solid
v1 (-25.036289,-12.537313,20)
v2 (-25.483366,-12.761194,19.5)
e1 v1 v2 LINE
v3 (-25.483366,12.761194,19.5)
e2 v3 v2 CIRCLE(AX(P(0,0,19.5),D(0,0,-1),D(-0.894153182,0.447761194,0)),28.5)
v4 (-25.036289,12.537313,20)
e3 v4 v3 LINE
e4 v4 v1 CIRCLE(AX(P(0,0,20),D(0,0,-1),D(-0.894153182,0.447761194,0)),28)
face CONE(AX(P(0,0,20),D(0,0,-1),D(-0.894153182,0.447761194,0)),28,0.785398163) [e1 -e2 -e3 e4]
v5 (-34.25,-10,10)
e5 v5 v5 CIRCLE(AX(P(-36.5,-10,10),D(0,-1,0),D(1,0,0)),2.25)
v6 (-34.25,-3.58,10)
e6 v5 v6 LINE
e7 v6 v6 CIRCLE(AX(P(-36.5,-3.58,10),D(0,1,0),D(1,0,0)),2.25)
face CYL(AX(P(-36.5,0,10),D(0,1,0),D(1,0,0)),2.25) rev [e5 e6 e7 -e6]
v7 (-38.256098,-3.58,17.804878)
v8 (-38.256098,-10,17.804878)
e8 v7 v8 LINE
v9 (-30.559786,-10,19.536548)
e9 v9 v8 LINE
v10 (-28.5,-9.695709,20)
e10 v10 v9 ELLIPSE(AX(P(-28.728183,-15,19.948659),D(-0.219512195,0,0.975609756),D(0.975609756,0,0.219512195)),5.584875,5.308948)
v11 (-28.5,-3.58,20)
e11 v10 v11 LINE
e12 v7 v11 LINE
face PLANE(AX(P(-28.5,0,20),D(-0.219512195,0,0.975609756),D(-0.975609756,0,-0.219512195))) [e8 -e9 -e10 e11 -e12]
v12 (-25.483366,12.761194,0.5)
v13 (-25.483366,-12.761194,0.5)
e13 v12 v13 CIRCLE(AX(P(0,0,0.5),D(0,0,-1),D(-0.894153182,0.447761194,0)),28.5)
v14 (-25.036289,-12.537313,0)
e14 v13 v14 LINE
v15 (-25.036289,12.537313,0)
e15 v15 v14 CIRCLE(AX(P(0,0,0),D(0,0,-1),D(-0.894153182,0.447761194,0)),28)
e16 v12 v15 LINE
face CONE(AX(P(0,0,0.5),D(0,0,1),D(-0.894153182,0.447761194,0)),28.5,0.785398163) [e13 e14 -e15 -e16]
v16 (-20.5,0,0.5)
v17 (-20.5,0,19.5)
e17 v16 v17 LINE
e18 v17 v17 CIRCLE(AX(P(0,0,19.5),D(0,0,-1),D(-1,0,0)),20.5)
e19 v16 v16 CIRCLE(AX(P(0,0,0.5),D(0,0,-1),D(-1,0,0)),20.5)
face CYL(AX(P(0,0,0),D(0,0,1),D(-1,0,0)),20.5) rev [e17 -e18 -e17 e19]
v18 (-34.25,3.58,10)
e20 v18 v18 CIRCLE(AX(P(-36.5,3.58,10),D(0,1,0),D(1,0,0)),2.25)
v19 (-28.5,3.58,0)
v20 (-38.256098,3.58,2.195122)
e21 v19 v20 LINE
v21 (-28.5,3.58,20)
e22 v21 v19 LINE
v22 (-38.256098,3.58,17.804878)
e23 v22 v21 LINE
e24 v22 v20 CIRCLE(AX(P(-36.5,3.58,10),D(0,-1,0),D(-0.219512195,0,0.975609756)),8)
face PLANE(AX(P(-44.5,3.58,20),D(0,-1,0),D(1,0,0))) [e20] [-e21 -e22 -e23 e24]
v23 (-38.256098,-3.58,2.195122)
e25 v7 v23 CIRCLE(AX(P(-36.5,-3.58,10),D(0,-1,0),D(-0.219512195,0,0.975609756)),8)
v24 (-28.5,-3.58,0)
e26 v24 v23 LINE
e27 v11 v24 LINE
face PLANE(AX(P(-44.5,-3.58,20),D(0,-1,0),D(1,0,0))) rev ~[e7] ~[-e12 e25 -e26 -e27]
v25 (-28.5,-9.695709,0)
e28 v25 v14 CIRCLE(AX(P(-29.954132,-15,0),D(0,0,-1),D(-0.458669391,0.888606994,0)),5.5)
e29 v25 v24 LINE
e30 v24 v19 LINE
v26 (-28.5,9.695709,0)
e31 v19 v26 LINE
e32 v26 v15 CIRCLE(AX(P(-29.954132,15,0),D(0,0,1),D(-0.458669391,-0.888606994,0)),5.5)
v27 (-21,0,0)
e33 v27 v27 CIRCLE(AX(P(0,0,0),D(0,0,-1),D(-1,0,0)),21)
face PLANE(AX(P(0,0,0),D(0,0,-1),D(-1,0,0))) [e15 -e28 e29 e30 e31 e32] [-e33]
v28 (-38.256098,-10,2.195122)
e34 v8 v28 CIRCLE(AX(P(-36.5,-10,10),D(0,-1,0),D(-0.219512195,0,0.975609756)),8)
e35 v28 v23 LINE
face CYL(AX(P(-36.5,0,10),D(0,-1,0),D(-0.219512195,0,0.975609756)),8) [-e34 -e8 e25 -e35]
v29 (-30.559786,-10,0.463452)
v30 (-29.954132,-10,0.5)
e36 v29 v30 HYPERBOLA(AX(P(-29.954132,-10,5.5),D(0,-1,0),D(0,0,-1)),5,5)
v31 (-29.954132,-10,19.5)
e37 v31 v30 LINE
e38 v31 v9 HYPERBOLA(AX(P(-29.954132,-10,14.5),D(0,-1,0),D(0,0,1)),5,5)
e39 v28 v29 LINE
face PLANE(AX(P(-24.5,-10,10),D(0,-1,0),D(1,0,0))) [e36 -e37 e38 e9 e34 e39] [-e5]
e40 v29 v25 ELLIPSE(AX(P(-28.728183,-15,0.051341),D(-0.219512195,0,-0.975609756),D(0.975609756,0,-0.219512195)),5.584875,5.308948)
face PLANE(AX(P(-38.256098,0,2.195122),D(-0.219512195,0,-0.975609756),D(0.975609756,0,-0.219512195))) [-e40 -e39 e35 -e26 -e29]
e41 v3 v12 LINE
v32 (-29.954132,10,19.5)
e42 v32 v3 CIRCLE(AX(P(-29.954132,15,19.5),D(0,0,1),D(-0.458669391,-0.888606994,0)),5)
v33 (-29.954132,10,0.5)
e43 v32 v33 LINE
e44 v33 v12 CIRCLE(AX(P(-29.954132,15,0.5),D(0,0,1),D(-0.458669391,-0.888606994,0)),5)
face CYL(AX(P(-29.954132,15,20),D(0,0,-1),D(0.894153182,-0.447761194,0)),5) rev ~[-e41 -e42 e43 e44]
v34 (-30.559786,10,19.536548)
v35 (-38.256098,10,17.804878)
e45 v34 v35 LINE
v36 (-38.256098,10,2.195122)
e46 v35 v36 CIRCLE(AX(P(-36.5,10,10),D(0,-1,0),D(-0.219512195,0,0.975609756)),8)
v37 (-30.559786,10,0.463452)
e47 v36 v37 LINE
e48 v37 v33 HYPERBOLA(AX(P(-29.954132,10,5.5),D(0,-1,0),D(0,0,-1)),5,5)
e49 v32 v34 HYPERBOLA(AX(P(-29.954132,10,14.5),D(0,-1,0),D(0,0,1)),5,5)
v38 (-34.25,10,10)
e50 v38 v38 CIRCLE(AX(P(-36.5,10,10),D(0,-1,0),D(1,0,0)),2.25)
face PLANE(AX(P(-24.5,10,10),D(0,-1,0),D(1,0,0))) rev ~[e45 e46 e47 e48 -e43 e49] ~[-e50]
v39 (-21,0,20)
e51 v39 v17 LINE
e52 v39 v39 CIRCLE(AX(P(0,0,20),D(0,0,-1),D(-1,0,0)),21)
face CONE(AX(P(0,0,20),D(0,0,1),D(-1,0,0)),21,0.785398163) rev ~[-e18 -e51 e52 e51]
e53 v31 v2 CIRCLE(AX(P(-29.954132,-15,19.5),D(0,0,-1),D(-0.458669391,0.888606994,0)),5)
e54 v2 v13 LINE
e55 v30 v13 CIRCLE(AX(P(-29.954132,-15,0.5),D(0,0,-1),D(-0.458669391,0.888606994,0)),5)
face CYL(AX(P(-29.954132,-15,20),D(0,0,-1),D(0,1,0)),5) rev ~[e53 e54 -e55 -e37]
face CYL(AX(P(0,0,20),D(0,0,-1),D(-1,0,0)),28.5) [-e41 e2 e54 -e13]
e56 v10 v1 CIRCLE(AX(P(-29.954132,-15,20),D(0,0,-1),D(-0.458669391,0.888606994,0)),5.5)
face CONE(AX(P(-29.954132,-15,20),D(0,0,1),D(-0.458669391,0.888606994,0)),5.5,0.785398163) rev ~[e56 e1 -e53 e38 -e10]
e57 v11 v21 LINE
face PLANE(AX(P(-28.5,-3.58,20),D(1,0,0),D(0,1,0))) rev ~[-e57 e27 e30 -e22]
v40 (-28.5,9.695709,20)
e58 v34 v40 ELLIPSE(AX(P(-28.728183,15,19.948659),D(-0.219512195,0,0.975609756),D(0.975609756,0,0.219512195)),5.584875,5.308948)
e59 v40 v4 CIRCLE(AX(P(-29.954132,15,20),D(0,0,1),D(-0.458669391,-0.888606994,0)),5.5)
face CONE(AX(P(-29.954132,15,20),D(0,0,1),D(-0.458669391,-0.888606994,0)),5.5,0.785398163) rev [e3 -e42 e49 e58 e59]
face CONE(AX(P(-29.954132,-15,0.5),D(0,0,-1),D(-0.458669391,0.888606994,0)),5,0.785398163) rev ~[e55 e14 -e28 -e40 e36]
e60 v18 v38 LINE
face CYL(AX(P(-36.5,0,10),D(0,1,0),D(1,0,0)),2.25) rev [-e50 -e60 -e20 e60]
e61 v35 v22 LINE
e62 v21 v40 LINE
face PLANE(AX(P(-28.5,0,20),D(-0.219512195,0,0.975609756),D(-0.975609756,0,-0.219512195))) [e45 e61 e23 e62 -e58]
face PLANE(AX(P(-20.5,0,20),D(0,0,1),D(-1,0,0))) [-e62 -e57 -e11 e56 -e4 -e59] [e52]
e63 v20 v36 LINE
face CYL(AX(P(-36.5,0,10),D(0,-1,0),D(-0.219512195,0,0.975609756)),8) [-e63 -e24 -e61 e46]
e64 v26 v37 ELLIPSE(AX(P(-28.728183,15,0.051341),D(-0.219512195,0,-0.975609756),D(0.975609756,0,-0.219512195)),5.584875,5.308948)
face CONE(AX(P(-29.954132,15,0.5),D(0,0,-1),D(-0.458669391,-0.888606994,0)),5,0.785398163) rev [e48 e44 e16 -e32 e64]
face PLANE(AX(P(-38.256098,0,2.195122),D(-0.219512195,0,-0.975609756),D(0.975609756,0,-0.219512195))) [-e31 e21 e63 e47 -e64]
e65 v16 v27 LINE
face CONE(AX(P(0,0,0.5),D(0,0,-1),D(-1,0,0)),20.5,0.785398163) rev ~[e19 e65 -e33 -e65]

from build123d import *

# Parameters (mm, degrees)
F0_R         = 2.25
F2_DEPTH     = 10
F3_W         = 16
F3_H         = 7.16
F4_DEPTH     = 20.001
F5_R         = 5
F6_T2_ANGLE  = 306.799730078
F6_T4_ANGLE  = 306.799730078
F6_T10_ANGLE = 90.7011440301
F6_T12_ANGLE = 90.7011440301
F6_T14_ANGLE = 90.7011440301
F6_T16_ANGLE = 90.7011440301


# Not quite as in the source:
# - a fillet or chamfer that OpenCascade refuses, or shapes differently, is made with other operations: its cross-section is extruded or revolved along the edge and cut away or added


with BuildPart() as f1:
    # F0 (on Front) → F1 (revolve)
    with BuildSketch(Plane.XZ):
        Polygon((-20.5, 0), (-20.5, 20), (-28.5, 20), (-28.5, 10), (-28.5, 0), align=None)
    revolve(axis=Axis((0, 0, 23.8705657878), (0, 0, -1)))

    # F0 (on Front) → F2 (join, symmetric)
    with BuildSketch(Plane.XZ):
        Polygon((-20.5, 0), (-20.5, 20), (-28.5, 20), (-28.5, 10), (-28.5, 0), align=None)
        with BuildLine():
            Line((-28.5, 10), (-28.5, 20))
            Line((-28.5, 20), (-38.256097561, 17.8048780488))
            ThreePointArc((-38.256097561, 17.8048780488), (-31.5024396196, 16.2469504755), (-28.5, 10))
        make_face()
        with BuildLine():
            Line((-38.256097561, 2.1951219512), (-28.5, 0))
            Line((-28.5, 0), (-28.5, 10))
            ThreePointArc((-28.5, 10), (-31.5024396196, 3.7530495245), (-38.256097561, 2.1951219512))
        make_face()
        with BuildLine():
            ThreePointArc((-38.256097561, 2.1951219512), (-31.5024396196, 3.7530495245), (-28.5, 10))
            ThreePointArc((-28.5, 10), (-31.5024396196, 16.2469504755), (-38.256097561, 17.8048780488))
            ThreePointArc((-38.256097561, 17.8048780488), (-44.5, 10), (-38.256097561, 2.1951219512))
        make_face()
        with Locations((-36.5, 10)):
            Circle(F0_R, mode=Mode.SUBTRACT)
    extrude(amount=F2_DEPTH, both=True)

    # F3 (on face) → F4 (cut, through all)
    with BuildSketch(Plane.XY.offset(20)):
        with Locations((-36.5, 0)):
            Rectangle(F3_W, F3_H)
    extrude(amount=-F4_DEPTH, mode=Mode.SUBTRACT)

    # F5
    f5_edges = [f1.edges().sort_by_distance(p)[0] for p in [
        (-26.688012, 10, 10),
        (-26.688012, -10, 10),
    ]]
    fillet(f5_edges, radius=F5_R)

    # F6: chamfer of 0.5 on 8 edges, made by hand

    # F6_s1 → F6_t2 (revolve, cut)
    with BuildSketch(Plane(origin=(0, 0, 0), x_dir=(0, 0, 1), z_dir=(-0.447761194, -0.8941531821, 0))):
        Polygon((0.5, 28.5), (0, 28), (0, 28.5), align=None)
    revolve(axis=Axis((0, 0, 0), (0, 0, -1)), revolution_arc=F6_T2_ANGLE, mode=Mode.SUBTRACT)

    # F6_s3 → F6_t4 (revolve, cut)
    with BuildSketch(Plane(origin=(0, 0, 0), x_dir=(0, 0, 1), z_dir=(-0.447761194, -0.8941531821, 0))):
        Polygon((20, 28), (19.5, 28.5), (20, 28.5), align=None)
    revolve(axis=Axis((0, 0, 20), (0, 0, -1)), revolution_arc=F6_T4_ANGLE, mode=Mode.SUBTRACT)

    # F6_s5 → F6_t6 (revolve, cut)
    with BuildSketch(Plane.XZ):
        Polygon((-21, 20), (-20.5, 19.5), (-20.5, 20), align=None)
    revolve(axis=Axis((0, 0, 20), (0, 0, -1)), mode=Mode.SUBTRACT)

    # F6_s7 → F6_t8 (revolve, cut)
    with BuildSketch(Plane.XZ):
        Polygon((-20.5, 0.5), (-21, 0), (-20.5, 0), align=None)
    revolve(axis=Axis((0, 0, 0), (0, 0, -1)), mode=Mode.SUBTRACT)

    # F6_s9 → F6_t10 (revolve, cut)
    with BuildSketch(Plane(origin=(-29.7661054166, 15.3642741077, 0), x_dir=(0, 0, 1), z_dir=(-0.8886069942, 0.4586693906, 0))):
        Polygon((20, -5.9099383756), (19.5, -5.4099383756), (20, -5.4099383756), align=None)
    revolve(axis=Axis((-29.9541316015, 15, 20), (0, 0, 1)), revolution_arc=F6_T10_ANGLE, mode=Mode.SUBTRACT)

    # F6_s11 → F6_t12 (revolve, cut)
    with BuildSketch(Plane(origin=(-29.7661054166, -15.3642741077, 0), x_dir=(0, 0, 1), z_dir=(-0.8886069942, -0.4586693906, 0))):
        Polygon((20, 5.9099383756), (19.5, 5.4099383756), (20, 5.4099383756), align=None)
    revolve(axis=Axis((-29.9541316015, -15, 20), (0, 0, -1)), revolution_arc=F6_T12_ANGLE, mode=Mode.SUBTRACT)

    # F6_s13 → F6_t14 (revolve, cut)
    with BuildSketch(Plane(origin=(-29.7661054166, 15.3642741077, 0), x_dir=(0, 0, 1), z_dir=(-0.8886069942, 0.4586693906, 0))):
        Polygon((0.5, -5.4099383756), (0, -5.9099383756), (0, -5.4099383756), align=None)
    revolve(axis=Axis((-29.9541316015, 15, 0), (0, 0, 1)), revolution_arc=F6_T14_ANGLE, mode=Mode.SUBTRACT)

    # F6_s15 → F6_t16 (revolve, cut)
    with BuildSketch(Plane(origin=(-29.7661054166, -15.3642741077, 0), x_dir=(0, 0, 1), z_dir=(-0.8886069942, -0.4586693906, 0))):
        Polygon((0.5, 5.4099383756), (0, 5.9099383756), (0, 5.4099383756), align=None)
    revolve(axis=Axis((-29.9541316015, -15, 0), (0, 0, -1)), revolution_arc=F6_T16_ANGLE, mode=Mode.SUBTRACT)


solid = f1.part
